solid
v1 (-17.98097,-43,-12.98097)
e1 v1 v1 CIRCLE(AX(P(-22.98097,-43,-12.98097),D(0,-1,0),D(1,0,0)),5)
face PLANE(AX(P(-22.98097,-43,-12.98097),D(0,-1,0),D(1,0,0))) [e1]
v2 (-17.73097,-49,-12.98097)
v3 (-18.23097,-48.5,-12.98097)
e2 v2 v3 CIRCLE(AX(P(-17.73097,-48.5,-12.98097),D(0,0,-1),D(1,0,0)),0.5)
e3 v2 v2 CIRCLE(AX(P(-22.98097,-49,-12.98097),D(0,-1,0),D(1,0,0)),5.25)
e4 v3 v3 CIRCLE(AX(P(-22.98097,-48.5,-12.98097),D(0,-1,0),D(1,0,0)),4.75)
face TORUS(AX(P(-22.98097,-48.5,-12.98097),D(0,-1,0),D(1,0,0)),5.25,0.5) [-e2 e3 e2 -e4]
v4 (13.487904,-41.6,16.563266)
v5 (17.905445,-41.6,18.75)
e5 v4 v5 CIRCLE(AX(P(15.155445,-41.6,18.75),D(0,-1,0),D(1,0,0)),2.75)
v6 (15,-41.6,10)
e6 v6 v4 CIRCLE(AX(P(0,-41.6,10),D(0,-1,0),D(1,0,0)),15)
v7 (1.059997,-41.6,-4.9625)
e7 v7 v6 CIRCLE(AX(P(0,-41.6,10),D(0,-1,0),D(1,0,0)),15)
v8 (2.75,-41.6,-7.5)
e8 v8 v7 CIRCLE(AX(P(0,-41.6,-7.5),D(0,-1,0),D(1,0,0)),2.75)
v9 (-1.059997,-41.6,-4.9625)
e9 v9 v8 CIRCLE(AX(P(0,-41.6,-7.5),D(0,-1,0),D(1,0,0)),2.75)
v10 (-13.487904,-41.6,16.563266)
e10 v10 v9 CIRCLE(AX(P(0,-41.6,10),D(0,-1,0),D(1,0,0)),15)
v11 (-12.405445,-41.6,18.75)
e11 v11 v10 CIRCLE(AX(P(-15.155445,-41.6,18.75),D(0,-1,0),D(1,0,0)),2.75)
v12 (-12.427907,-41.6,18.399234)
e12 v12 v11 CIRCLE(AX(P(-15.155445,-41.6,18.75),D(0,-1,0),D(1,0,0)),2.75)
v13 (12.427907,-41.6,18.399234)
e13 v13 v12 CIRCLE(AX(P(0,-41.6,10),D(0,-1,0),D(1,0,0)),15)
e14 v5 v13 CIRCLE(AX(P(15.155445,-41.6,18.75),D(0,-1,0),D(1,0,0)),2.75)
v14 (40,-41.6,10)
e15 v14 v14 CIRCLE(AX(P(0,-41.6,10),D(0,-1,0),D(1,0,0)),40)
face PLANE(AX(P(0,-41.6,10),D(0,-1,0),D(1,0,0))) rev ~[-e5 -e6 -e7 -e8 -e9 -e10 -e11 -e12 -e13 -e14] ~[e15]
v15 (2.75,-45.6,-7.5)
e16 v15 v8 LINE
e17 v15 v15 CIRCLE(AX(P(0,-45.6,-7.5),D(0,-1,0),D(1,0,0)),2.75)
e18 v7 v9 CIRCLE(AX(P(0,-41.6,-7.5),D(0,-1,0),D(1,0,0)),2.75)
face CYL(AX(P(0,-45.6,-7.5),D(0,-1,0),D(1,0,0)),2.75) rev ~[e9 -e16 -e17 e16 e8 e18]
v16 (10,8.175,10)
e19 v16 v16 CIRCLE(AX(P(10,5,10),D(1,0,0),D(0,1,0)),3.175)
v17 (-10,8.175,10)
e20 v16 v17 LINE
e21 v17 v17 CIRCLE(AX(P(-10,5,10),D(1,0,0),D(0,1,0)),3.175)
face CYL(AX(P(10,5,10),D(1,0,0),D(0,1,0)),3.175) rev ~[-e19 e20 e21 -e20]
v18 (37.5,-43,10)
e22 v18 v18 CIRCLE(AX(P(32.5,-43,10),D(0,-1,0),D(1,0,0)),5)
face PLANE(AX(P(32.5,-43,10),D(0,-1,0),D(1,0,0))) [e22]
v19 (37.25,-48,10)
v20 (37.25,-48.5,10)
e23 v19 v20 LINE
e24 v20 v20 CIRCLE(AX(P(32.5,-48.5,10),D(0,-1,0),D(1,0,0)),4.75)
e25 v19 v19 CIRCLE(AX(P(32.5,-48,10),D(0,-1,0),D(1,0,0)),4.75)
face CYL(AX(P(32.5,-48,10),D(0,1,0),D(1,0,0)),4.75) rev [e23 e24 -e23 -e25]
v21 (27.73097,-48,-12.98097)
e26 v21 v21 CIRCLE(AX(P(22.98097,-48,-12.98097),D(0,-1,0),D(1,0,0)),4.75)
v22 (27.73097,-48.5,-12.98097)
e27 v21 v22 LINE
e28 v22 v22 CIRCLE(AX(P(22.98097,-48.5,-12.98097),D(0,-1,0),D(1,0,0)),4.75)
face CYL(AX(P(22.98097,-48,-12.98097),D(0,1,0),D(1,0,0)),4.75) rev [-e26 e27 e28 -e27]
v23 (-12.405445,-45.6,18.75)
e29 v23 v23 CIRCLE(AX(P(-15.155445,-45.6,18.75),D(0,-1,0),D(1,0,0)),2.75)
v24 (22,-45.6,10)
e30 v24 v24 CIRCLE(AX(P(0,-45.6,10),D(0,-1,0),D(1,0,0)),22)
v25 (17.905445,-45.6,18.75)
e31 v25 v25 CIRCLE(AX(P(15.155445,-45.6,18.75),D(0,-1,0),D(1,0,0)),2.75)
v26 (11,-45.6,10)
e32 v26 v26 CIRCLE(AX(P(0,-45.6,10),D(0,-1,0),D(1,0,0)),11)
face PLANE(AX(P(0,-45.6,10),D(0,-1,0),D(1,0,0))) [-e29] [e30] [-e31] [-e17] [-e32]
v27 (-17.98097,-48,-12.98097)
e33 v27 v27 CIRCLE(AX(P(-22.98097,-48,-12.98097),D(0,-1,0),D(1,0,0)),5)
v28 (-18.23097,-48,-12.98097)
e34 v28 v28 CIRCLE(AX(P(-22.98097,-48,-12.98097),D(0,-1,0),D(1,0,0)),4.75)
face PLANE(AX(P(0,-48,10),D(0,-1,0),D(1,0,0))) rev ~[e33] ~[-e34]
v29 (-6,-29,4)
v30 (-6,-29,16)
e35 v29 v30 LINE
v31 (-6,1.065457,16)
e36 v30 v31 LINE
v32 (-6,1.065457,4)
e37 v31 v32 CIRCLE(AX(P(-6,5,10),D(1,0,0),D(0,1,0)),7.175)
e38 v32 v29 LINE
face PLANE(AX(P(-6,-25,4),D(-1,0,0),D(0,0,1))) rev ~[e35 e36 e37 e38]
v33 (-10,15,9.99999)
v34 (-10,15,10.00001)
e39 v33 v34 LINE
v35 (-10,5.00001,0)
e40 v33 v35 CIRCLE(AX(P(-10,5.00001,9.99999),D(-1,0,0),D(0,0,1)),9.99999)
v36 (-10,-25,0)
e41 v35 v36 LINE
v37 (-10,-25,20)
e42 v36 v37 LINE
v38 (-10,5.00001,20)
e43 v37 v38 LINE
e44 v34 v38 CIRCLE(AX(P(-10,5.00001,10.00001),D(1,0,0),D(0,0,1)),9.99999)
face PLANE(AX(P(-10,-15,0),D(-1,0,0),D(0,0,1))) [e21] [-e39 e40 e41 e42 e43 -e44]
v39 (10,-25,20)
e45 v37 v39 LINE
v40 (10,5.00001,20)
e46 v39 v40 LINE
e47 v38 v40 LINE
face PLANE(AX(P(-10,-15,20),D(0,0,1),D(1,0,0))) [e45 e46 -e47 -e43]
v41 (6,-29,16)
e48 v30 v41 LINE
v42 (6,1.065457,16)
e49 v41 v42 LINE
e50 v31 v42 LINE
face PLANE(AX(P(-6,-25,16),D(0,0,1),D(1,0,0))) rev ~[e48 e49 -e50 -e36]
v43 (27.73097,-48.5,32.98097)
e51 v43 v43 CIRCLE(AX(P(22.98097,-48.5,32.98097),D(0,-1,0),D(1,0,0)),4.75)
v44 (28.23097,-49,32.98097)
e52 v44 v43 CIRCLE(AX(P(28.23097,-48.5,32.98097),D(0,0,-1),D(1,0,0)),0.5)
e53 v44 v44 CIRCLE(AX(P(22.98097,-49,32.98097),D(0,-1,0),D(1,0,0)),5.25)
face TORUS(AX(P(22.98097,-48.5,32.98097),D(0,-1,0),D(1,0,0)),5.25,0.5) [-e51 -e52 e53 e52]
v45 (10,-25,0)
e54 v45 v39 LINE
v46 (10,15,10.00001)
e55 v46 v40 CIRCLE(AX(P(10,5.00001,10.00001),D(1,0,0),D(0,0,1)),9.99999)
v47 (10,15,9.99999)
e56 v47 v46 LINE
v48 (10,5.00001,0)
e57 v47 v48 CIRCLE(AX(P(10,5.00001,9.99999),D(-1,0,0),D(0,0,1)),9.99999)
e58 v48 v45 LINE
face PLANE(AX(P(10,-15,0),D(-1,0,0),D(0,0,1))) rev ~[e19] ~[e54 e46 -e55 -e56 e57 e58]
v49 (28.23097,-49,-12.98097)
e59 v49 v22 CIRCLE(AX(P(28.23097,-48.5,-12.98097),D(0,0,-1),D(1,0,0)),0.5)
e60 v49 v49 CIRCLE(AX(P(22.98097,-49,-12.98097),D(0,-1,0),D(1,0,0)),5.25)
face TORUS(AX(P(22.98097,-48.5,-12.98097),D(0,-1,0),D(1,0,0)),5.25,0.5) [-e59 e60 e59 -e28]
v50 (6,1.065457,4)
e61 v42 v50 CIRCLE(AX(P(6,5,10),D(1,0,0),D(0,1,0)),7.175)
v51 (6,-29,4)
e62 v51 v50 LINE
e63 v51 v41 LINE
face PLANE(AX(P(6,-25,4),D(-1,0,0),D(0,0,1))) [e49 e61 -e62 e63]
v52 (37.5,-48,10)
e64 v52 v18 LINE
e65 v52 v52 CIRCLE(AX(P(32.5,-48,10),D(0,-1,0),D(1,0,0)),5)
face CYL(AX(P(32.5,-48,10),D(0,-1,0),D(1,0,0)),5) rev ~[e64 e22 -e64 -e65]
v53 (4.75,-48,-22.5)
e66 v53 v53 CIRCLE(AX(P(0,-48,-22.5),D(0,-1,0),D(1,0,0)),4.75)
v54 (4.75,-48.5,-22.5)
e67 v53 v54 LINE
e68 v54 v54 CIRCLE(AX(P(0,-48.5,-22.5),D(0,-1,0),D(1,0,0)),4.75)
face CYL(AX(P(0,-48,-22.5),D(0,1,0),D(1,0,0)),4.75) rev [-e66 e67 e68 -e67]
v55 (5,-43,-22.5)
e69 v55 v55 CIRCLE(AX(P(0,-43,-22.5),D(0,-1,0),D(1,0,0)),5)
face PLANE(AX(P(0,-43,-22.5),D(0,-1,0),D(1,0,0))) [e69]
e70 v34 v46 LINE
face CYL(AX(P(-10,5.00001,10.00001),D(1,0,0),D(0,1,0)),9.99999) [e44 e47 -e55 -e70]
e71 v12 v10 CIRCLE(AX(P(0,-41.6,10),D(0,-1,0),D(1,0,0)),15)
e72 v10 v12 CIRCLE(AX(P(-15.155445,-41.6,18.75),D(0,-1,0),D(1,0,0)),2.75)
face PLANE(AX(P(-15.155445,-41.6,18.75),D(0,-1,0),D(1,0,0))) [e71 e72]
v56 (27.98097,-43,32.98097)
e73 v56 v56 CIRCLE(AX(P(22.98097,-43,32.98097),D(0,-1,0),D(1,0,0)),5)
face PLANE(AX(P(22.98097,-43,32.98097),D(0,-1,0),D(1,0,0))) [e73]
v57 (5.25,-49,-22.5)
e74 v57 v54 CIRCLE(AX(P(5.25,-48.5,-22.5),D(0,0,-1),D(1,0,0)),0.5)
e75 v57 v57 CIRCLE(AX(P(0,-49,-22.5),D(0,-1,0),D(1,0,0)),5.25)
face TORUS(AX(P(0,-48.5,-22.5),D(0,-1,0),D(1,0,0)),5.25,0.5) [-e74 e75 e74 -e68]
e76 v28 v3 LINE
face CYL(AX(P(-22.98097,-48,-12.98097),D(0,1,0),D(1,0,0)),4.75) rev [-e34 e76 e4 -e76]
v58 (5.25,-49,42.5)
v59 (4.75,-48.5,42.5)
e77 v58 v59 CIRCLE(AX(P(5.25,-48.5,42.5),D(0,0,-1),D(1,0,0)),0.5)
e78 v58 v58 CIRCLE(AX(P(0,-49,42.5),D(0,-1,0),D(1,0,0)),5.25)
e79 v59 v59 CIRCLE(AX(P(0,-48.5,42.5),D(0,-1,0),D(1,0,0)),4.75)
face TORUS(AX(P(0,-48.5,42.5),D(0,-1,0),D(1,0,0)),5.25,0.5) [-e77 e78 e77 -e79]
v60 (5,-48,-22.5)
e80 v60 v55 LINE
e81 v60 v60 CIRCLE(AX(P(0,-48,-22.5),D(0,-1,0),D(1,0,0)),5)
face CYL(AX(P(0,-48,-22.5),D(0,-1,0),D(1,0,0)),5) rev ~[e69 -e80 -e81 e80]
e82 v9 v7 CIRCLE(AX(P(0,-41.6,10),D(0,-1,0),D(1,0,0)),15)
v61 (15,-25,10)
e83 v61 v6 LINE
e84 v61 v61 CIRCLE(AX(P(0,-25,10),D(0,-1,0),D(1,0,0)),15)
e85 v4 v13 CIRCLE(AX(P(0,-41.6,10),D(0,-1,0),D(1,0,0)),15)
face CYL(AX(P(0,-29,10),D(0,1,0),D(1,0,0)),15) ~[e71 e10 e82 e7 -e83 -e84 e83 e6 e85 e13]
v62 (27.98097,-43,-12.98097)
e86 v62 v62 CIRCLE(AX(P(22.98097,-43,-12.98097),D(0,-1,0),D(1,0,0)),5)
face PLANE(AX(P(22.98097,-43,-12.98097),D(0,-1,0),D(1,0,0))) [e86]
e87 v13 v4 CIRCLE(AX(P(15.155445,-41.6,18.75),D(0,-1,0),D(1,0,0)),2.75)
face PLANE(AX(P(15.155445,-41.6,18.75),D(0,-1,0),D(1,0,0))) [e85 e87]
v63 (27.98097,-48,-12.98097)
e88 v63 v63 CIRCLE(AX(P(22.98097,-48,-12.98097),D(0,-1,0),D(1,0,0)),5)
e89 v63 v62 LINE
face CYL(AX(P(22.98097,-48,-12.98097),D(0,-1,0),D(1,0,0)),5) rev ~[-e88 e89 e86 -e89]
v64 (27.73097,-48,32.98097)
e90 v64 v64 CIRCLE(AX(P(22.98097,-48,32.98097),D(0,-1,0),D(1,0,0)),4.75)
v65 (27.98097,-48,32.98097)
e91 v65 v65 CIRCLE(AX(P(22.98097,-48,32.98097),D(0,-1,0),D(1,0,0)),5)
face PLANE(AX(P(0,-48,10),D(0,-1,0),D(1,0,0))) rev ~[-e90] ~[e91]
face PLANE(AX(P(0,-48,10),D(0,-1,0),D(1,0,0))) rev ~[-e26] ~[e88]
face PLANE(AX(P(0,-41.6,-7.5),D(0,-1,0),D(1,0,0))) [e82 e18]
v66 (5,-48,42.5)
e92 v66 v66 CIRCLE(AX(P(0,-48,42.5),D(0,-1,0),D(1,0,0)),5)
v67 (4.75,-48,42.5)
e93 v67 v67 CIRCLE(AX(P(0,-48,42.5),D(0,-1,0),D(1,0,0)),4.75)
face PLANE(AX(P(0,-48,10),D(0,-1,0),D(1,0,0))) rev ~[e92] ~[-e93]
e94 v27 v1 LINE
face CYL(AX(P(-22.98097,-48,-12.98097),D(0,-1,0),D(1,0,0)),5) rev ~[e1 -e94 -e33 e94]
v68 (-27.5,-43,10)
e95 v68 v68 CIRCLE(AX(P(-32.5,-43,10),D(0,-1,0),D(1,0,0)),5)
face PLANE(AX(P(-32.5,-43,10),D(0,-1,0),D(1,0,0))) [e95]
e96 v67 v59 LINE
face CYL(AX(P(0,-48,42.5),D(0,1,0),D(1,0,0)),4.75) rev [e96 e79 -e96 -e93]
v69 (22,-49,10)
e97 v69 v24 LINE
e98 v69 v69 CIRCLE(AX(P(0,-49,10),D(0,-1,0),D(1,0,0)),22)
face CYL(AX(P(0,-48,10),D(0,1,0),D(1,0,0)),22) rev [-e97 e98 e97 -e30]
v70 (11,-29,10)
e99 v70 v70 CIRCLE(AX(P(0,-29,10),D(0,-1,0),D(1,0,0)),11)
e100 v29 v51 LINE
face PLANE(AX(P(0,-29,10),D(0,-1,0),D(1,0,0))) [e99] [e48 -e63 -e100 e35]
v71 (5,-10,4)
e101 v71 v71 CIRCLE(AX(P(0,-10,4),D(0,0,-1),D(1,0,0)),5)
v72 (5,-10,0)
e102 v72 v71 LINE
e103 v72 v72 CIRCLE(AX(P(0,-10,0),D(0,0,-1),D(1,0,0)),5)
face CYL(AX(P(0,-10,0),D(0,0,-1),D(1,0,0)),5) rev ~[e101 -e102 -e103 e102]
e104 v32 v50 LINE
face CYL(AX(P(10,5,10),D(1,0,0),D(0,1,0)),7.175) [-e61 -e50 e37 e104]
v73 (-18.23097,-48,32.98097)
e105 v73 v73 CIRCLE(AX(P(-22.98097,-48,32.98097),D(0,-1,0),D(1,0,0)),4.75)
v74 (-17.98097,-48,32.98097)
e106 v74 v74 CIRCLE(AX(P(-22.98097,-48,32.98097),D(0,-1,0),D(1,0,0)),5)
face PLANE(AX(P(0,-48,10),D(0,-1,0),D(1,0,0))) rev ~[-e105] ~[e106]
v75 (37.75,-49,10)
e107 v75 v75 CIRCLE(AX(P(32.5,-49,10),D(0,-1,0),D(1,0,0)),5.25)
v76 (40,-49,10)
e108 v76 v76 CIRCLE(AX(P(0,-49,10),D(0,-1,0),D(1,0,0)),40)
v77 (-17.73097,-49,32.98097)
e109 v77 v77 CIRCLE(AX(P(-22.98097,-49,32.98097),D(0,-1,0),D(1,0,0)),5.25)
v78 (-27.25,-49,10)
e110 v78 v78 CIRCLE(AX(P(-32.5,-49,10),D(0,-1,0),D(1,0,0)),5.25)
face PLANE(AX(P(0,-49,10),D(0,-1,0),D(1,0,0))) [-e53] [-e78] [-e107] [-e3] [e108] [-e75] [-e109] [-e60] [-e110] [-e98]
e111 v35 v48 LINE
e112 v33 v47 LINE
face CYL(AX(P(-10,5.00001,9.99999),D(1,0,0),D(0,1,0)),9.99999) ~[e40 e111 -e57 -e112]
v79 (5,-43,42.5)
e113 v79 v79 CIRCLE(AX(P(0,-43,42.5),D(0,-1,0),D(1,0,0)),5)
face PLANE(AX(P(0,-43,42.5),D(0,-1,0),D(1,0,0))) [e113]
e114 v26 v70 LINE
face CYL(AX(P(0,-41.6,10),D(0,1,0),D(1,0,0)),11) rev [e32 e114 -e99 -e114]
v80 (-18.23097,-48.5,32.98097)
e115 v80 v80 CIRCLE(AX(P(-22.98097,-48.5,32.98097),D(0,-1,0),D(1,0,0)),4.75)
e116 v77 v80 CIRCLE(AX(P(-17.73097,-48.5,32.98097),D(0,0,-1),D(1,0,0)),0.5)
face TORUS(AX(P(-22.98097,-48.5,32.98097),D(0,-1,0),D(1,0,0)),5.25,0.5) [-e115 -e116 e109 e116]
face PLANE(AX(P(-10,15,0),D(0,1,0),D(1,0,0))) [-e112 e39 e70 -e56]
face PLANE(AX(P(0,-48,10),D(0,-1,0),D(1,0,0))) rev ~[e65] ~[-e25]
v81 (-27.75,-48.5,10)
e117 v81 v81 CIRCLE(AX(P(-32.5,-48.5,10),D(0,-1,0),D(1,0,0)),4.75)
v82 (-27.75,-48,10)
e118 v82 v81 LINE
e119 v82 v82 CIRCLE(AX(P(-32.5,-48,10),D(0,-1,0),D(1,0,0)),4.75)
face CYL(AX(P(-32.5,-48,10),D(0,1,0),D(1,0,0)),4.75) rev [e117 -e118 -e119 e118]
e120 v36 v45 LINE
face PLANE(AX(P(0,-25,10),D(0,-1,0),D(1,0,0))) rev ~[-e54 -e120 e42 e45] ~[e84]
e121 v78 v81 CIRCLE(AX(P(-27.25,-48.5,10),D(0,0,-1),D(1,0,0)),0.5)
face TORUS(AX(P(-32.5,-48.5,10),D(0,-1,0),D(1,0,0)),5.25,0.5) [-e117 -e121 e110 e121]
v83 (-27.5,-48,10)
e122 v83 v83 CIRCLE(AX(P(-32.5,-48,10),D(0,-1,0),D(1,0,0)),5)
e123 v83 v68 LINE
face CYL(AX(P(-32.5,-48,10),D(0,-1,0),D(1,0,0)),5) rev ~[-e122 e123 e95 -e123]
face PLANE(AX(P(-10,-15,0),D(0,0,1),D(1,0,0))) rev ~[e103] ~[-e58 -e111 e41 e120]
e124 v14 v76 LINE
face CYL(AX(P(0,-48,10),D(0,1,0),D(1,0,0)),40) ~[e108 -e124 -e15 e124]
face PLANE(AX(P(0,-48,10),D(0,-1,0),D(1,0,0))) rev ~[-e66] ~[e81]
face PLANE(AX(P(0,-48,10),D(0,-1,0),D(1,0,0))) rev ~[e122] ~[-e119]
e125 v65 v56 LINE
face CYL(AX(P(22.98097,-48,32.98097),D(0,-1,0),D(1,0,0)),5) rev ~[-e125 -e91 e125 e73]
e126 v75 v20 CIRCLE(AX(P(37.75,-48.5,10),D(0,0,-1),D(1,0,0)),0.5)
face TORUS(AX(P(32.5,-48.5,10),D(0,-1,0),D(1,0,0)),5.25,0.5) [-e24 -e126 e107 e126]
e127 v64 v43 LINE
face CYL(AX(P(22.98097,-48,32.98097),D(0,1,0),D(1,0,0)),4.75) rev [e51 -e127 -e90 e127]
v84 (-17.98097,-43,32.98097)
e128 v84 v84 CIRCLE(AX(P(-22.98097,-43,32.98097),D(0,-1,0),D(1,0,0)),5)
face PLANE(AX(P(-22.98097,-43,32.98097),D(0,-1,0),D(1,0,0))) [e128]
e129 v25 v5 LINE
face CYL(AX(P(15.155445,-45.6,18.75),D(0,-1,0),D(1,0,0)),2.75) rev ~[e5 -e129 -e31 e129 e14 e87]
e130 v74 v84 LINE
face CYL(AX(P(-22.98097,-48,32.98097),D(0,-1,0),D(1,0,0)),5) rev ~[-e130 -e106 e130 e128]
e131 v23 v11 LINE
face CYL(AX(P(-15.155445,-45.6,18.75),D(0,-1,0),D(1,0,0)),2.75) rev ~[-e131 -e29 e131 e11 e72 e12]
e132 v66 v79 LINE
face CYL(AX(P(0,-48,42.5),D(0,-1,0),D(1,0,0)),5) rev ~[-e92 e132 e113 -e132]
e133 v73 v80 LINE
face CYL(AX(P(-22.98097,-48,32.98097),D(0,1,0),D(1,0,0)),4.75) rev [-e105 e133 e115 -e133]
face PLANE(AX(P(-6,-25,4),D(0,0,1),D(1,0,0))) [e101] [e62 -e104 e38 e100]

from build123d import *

# Parameters (mm, degrees)
F0_W      = 20
F0_H      = 30
F1_DEPTH  = 20
F2_R      = 9.99999
F3_R      = 3.175
F4_DEPTH  = 25
F5_DEPTH  = 10
F6_T      = -4
F7_R      = 5
F8_DEPTH  = 4
F9_R      = 15
F9_W      = 20
F9_H      = 20
F9_W_2    = 12
F9_H_2    = 12
F10_DEPTH = 4
F11_R     = 15
F11_R_2   = 11
F12_DEPTH = 12.6
F13_R     = 40
F13_R_2   = 15
F13_R_3   = 11
F14_DEPTH = 4
F15_R     = 40
F15_R_2   = 22
F16_DEPTH = 2.4
F17_R     = 2.75
F18_DEPTH = 4
F19_R     = 5
F20_DEPTH = 5
F21_R     = 40
F21_R_2   = 5
F21_R_3   = 22
F21_R_4   = 4.75
F22_DEPTH = 1
F23_R     = 0.5


# Not quite as in the source:
# - a fillet or chamfer is up to 0.001 mm smaller than in the source, because OpenCascade refuses the exact size


with BuildPart() as f1:
    # F0 (on Top) → F1 (new body)
    with BuildSketch(Plane.XY):
        Rectangle(F0_W, F0_H)
    extrude(amount=F1_DEPTH)

    # F2 (radius 10 in the source; OpenCascade refuses exactly that, so slightly less here)
    f2_edges = [f1.edges().sort_by_distance(p)[0] for p in [
        (0, 15, 20),
        (0, 15, 0),
    ]]
    fillet(f2_edges, radius=F2_R)

    # F3 (on face) → F4 (cut)
    with BuildSketch(Plane.YZ.offset(10)):
        with Locations((5, 10)):
            Circle(F3_R)
    extrude(amount=-F4_DEPTH, mode=Mode.SUBTRACT)

    # F5 (add): a face of the model
    f5_faces = [f1.faces().sort_by_distance(p)[0] for p in [
        (0, -15, 10),
    ]]
    extrude(f5_faces, amount=F5_DEPTH)

    # F6
    f6_openings = [f1.faces().sort_by_distance(p)[0] for p in [
        (0, -25, 10),
    ]]
    offset(amount=F6_T, openings=f6_openings)

    # F7 (on face) → F8 (cut)
    with BuildSketch(Plane(origin=(0, 0, 0), x_dir=(1, 0, 0), z_dir=(0, 0, -1))):
        with Locations((0, 10)):
            Circle(F7_R)
    extrude(amount=-F8_DEPTH, mode=Mode.SUBTRACT)

    # F9 (on face) → F10 (join)
    with BuildSketch(Plane.XZ.offset(25)):
        with Locations((0, 10)):
            Circle(F9_R)
        with Locations((0, 10)):
            Rectangle(F9_W, F9_H, mode=Mode.SUBTRACT)
        with Locations((0, 10)):
            Rectangle(F9_W, F9_H)
        with Locations((0, 10)):
            Rectangle(F9_W_2, F9_H_2, mode=Mode.SUBTRACT)
    extrude(amount=F10_DEPTH)

    # F11 (on face) → F12 (join)
    with BuildSketch(Plane.XZ.offset(29)):
        with Locations((0, 10)):
            Circle(F11_R)
        with Locations((0, 10)):
            Circle(F11_R_2, mode=Mode.SUBTRACT)
    extrude(amount=F12_DEPTH)

    # F13 (on face) → F14 (join)
    with BuildSketch(Plane.XZ.offset(41.6)):
        with Locations((0, 10)):
            Circle(F13_R)
        with Locations((0, 10)):
            Circle(F13_R_2, mode=Mode.SUBTRACT)
        with Locations((0, 10)):
            Circle(F13_R_2)
        with Locations((0, 10)):
            Circle(F13_R_3, mode=Mode.SUBTRACT)
    extrude(amount=F14_DEPTH)

    # F15 (on face) → F16 (join)
    with BuildSketch(Plane.XZ.offset(45.6)):
        with Locations((0, 10)):
            Circle(F15_R)
        with Locations((0, 10)):
            Circle(F15_R_2, mode=Mode.SUBTRACT)
    extrude(amount=F16_DEPTH)

    # F17 (on face) → F18 (cut)
    with BuildSketch(Plane.XZ.offset(45.6)):
        with Locations((15.1554445662, 18.75)):
            Circle(F17_R)
        with Locations((0, -7.5)):
            Circle(F17_R)
        with Locations((-15.1554445662, 18.75)):
            Circle(F17_R)
    extrude(amount=-F18_DEPTH, mode=Mode.SUBTRACT)

    # F19 (on face) → F20 (cut)
    with BuildSketch(Plane.XZ.offset(48)):
        with Locations((0, 42.5)):
            Circle(F19_R)
        with Locations((-22.9809703886, 32.9809703886)):
            Circle(F19_R)
        with Locations((-32.5, 10)):
            Circle(F19_R)
        with Locations((-22.9809703886, -12.9809703886)):
            Circle(F19_R)
        with Locations((0, -22.5)):
            Circle(F19_R)
        with Locations((22.9809703886, -12.9809703886)):
            Circle(F19_R)
        with Locations((32.5, 10)):
            Circle(F19_R)
        with Locations((22.9809703886, 32.9809703886)):
            Circle(F19_R)
    extrude(amount=-F20_DEPTH, mode=Mode.SUBTRACT)

    # F21 (on face) → F22 (join)
    with BuildSketch(Plane.XZ.offset(48)):
        with Locations((0, 10)):
            Circle(F21_R)
        with Locations((-22.9809703886, -12.9809703886)):
            Circle(F21_R_2, mode=Mode.SUBTRACT)
        with Locations((0, -22.5)):
            Circle(F21_R_2, mode=Mode.SUBTRACT)
        with Locations((22.9809703886, -12.9809703886)):
            Circle(F21_R_2, mode=Mode.SUBTRACT)
        with Locations((-32.5, 10)):
            Circle(F21_R_2, mode=Mode.SUBTRACT)
        with Locations((-22.9809703886, 32.9809703886)):
            Circle(F21_R_2, mode=Mode.SUBTRACT)
        with Locations((0, 10)):
            Circle(F21_R_3, mode=Mode.SUBTRACT)
        with Locations((32.5, 10)):
            Circle(F21_R_2, mode=Mode.SUBTRACT)
        with Locations((0, 42.5)):
            Circle(F21_R_2, mode=Mode.SUBTRACT)
        with Locations((22.9809703886, 32.9809703886)):
            Circle(F21_R_2, mode=Mode.SUBTRACT)
        with Locations((0, 42.5)):
            Circle(F21_R_2)
        with Locations((0, 42.5)):
            Circle(F21_R_4, mode=Mode.SUBTRACT)
        with Locations((22.9809703886, 32.9809703886)):
            Circle(F21_R_2)
        with Locations((22.9809703886, 32.9809703886)):
            Circle(F21_R_4, mode=Mode.SUBTRACT)
        with Locations((-22.9809703886, 32.9809703886)):
            Circle(F21_R_2)
        with Locations((-22.9809703886, 32.9809703886)):
            Circle(F21_R_4, mode=Mode.SUBTRACT)
        with Locations((32.5, 10)):
            Circle(F21_R_2)
        with Locations((32.5, 10)):
            Circle(F21_R_4, mode=Mode.SUBTRACT)
        with Locations((-32.5, 10)):
            Circle(F21_R_2)
        with Locations((-32.5, 10)):
            Circle(F21_R_4, mode=Mode.SUBTRACT)
        with Locations((-22.9809703886, -12.9809703886)):
            Circle(F21_R_2)
        with Locations((-22.9809703886, -12.9809703886)):
            Circle(F21_R_4, mode=Mode.SUBTRACT)
        with Locations((0, -22.5)):
            Circle(F21_R_2)
        with Locations((0, -22.5)):
            Circle(F21_R_4, mode=Mode.SUBTRACT)
        with Locations((22.9809703886, -12.9809703886)):
            Circle(F21_R_2)
        with Locations((22.9809703886, -12.9809703886)):
            Circle(F21_R_4, mode=Mode.SUBTRACT)
    extrude(amount=F22_DEPTH)

    # F23
    f23_edges = [f1.edges().sort_by_distance(p)[0] for p in [
        (-4.75, -49, 42.5),
        (18.23097, -49, 32.98097),
        (27.75, -49, 10),
        (-27.73097, -49, 32.98097),
        (-37.25, -49, 10),
        (-27.73097, -49, -12.98097),
        (-4.75, -49, -22.5),
        (18.23097, -49, -12.98097),
    ]]
    fillet(f23_edges, radius=F23_R)


solid = f1.part
